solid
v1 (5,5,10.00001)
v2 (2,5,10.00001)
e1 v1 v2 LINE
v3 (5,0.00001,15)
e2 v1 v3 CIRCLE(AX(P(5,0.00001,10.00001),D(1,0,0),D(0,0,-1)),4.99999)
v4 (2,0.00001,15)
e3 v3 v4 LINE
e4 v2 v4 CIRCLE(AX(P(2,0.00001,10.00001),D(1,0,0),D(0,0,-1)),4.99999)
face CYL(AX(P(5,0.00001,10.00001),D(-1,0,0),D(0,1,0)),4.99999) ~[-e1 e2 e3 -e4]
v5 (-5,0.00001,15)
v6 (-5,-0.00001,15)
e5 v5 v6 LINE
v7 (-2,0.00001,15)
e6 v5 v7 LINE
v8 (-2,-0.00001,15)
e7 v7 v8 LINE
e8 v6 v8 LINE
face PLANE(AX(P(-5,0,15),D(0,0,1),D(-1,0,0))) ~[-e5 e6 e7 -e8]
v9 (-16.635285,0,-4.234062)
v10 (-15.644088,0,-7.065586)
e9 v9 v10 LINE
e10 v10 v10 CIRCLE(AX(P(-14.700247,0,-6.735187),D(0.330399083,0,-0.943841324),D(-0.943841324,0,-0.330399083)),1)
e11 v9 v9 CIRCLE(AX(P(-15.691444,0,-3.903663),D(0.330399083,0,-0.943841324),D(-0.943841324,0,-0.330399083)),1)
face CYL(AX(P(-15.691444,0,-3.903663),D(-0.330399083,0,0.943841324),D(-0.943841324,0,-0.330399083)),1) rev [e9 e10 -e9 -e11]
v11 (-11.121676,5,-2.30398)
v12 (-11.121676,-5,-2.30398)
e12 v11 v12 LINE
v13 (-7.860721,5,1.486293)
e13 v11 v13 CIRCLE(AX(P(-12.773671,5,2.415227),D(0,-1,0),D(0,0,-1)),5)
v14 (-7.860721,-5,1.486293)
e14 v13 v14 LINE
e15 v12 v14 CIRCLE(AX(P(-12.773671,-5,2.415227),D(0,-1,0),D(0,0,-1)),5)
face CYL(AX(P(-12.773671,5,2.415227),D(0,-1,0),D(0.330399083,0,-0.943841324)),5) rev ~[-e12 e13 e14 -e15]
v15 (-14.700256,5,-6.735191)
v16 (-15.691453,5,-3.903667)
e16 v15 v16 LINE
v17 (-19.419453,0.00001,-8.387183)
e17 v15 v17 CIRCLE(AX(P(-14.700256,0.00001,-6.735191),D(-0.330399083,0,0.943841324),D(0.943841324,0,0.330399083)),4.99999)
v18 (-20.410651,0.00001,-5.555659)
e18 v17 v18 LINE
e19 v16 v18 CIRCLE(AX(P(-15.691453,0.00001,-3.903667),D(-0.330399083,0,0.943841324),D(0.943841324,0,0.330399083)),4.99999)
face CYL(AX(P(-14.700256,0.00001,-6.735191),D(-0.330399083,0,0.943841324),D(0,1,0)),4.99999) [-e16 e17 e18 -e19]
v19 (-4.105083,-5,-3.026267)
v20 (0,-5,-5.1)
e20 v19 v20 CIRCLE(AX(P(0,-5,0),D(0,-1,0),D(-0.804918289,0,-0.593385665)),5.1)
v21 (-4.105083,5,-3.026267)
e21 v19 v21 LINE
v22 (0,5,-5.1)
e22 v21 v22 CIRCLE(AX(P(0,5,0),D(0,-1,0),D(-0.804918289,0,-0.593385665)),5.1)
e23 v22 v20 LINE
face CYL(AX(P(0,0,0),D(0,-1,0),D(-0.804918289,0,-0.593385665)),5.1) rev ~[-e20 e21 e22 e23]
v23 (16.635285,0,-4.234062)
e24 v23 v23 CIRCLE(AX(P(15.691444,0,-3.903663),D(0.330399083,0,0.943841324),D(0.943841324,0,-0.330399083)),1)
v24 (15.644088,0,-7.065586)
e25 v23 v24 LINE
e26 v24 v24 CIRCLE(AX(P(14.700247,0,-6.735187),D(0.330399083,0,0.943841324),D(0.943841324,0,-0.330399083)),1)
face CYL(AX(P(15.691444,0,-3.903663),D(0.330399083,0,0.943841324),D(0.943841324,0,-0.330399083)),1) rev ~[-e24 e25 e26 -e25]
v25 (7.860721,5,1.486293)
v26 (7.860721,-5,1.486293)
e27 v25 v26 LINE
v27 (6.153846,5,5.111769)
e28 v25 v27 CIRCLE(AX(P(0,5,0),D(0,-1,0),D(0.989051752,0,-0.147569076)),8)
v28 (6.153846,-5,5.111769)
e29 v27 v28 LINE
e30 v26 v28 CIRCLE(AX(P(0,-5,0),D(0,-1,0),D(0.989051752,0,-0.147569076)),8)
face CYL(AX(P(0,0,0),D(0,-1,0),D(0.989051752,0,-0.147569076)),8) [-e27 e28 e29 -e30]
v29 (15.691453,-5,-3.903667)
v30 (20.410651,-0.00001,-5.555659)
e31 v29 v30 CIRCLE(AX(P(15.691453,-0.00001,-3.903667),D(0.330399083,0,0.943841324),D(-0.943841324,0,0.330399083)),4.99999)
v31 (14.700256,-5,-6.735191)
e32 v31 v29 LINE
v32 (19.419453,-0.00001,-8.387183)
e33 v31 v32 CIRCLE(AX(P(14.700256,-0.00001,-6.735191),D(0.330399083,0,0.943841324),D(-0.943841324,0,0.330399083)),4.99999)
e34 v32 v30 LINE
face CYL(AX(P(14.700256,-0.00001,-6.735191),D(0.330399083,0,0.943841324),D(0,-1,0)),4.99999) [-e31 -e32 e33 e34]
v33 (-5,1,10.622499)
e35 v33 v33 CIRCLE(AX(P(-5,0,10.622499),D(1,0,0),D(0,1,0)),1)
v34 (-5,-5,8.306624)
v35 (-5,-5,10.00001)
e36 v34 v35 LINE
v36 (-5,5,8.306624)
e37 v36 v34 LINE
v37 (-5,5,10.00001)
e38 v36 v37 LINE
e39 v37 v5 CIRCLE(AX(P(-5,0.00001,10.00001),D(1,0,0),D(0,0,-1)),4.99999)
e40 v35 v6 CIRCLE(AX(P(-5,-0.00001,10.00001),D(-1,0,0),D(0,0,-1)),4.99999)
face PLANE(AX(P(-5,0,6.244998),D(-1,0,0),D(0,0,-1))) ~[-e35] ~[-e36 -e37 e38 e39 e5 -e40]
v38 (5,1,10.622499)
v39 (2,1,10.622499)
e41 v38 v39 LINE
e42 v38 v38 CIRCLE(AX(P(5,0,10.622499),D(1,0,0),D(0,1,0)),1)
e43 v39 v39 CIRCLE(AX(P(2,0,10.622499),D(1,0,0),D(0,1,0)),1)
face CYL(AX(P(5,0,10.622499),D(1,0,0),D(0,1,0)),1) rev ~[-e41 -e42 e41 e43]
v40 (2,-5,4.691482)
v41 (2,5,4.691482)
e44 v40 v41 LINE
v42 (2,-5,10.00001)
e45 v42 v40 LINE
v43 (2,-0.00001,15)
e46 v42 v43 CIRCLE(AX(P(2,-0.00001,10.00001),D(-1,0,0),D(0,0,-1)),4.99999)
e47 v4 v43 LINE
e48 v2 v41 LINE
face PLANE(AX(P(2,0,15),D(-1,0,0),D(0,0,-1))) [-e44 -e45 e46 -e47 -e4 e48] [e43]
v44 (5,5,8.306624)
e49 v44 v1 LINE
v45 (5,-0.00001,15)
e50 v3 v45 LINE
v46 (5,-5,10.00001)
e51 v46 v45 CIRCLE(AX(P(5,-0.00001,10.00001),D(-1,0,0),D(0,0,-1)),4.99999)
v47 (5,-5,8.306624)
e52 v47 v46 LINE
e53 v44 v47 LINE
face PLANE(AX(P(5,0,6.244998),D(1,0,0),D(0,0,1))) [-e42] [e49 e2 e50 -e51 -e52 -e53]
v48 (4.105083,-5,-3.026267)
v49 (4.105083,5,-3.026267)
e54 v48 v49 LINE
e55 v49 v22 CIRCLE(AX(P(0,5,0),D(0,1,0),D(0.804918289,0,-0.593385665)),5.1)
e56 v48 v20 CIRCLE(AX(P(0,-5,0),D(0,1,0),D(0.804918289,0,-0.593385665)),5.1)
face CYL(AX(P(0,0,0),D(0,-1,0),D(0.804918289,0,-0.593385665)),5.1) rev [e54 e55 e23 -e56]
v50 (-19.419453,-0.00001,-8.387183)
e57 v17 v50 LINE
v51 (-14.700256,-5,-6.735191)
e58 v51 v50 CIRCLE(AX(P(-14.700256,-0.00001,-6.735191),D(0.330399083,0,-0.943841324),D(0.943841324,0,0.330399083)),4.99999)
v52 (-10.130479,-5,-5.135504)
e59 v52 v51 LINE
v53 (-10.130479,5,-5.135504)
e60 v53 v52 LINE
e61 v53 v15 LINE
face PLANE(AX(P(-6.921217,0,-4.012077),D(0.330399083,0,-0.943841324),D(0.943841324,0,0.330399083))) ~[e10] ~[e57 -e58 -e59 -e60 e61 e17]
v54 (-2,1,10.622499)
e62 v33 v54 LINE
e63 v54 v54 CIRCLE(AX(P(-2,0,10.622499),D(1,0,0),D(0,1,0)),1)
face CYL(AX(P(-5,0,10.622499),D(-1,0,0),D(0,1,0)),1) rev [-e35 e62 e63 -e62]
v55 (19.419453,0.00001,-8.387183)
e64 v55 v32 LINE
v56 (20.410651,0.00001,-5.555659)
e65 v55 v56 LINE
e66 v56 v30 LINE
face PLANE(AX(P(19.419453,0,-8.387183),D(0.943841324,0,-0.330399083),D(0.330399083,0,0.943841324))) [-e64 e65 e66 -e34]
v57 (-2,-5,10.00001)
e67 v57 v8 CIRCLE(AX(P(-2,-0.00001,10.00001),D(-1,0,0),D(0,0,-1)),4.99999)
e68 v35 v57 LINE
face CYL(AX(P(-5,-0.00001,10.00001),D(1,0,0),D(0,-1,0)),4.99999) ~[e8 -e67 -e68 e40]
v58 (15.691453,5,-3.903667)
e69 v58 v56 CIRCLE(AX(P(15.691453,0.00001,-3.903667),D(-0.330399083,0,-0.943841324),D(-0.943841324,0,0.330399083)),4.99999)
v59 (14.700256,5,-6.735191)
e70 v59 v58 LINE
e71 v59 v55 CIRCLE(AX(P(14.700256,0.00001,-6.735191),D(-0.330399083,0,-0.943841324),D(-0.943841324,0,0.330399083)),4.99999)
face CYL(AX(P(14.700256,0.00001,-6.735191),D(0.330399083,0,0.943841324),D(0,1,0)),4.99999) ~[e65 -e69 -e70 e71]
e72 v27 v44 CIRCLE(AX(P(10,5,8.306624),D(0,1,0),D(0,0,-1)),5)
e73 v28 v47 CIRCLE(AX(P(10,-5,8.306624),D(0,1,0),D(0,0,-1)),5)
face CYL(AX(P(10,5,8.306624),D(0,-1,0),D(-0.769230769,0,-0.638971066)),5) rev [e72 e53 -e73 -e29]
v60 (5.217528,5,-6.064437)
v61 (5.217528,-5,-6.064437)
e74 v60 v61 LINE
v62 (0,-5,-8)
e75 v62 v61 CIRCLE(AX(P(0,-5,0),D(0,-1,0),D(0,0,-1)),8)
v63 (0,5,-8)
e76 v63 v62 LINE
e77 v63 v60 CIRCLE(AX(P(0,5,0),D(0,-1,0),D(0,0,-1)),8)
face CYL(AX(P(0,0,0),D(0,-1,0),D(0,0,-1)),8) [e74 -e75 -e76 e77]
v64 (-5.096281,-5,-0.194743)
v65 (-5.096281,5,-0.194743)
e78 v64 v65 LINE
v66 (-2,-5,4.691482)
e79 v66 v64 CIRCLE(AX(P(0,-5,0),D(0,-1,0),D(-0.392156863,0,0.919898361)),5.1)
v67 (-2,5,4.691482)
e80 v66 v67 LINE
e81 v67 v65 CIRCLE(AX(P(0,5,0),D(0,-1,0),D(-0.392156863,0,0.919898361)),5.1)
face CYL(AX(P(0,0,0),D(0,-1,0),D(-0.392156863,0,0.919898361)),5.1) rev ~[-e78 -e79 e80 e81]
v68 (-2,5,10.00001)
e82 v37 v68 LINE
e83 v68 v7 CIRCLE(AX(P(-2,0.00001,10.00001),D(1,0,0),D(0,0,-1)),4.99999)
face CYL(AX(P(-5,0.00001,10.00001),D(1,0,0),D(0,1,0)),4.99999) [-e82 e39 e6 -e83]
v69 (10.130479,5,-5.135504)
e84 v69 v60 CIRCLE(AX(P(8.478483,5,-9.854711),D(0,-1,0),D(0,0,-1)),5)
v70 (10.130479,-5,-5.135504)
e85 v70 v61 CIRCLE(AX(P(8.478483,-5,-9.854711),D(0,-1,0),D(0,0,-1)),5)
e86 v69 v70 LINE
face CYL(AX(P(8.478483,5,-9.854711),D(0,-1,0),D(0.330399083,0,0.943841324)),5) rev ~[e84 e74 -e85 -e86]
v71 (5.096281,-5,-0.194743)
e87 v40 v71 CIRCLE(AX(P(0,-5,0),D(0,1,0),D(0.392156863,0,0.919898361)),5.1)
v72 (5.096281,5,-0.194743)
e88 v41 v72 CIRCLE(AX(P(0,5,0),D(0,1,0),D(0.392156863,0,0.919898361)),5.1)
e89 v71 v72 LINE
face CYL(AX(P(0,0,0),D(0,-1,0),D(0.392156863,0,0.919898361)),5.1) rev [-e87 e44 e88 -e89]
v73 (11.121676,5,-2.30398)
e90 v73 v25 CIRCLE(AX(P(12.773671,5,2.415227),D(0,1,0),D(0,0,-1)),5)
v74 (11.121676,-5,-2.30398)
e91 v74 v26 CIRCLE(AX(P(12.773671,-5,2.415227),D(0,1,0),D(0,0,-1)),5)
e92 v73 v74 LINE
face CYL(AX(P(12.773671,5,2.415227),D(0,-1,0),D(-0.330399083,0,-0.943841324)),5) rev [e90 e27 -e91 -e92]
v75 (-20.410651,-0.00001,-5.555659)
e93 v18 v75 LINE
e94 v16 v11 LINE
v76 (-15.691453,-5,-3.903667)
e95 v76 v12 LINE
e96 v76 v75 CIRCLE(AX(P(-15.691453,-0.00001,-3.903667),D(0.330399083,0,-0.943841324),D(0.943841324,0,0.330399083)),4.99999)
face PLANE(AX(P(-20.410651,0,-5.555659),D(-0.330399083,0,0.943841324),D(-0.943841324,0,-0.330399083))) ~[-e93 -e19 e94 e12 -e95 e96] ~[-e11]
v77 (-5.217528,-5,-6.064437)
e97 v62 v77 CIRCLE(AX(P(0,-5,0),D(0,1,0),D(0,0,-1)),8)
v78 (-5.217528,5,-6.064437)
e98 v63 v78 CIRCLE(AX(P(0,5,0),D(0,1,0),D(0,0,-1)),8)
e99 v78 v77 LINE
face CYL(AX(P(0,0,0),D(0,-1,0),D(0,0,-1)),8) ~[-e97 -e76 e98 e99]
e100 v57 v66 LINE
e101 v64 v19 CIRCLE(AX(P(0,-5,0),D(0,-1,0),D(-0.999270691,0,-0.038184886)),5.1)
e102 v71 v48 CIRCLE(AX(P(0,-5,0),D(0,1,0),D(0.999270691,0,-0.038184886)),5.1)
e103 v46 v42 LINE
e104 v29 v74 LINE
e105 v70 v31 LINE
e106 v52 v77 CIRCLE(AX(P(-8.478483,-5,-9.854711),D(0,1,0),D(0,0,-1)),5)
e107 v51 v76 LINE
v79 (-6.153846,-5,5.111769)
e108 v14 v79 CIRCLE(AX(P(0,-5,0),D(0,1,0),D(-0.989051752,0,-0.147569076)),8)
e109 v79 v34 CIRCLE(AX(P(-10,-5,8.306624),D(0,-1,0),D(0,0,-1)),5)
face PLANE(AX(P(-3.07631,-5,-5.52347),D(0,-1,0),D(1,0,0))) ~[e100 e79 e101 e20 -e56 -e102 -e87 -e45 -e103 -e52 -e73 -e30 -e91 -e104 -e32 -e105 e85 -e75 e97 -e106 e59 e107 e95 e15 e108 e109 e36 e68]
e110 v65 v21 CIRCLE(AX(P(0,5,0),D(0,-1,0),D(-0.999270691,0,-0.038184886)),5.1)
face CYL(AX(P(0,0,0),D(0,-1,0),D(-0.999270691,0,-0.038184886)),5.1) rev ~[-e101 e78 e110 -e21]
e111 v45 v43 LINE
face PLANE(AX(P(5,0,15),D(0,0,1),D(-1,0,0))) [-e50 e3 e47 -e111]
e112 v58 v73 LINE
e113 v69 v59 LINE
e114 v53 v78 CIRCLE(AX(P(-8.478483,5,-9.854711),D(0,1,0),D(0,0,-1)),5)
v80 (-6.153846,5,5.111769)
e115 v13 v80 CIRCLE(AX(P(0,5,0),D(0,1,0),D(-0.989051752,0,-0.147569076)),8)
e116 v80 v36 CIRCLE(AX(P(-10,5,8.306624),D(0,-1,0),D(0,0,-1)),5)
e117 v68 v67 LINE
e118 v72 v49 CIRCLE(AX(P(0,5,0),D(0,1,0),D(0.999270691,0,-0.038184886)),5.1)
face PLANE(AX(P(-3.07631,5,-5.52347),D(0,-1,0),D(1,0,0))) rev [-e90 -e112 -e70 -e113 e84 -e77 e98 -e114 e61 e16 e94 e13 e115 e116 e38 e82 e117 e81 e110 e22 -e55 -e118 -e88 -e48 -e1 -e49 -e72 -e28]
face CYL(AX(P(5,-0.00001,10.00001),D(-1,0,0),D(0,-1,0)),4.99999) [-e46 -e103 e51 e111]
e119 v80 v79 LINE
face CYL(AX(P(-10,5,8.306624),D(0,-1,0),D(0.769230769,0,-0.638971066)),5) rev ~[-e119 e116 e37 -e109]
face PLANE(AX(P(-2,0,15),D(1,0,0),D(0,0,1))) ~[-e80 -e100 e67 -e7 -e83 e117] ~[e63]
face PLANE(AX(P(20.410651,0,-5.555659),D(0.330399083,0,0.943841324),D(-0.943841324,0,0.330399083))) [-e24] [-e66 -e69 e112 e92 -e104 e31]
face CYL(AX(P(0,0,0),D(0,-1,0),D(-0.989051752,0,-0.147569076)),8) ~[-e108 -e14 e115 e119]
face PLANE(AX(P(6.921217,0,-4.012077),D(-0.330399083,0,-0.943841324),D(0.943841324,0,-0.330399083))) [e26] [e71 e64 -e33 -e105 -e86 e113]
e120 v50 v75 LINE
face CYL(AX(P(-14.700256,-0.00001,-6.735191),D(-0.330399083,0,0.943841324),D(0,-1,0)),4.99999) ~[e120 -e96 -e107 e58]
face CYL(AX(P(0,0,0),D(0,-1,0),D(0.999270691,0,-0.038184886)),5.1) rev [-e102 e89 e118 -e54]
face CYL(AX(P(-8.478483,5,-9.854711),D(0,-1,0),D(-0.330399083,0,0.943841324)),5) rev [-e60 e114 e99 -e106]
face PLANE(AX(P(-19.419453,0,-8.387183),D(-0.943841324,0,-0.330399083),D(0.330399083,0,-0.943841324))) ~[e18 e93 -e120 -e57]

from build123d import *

# Parameters (mm, degrees)
F1_DEPTH = 5
F2_R     = 1
F3_DEPTH = 25
F4_R     = 1
F5_DEPTH = 25
F6_R     = 4.99999
F7_R     = 5


# Not quite as in the source:
# - a fillet or chamfer is up to 0.001 mm smaller than in the source, because OpenCascade refuses the exact size
# - a feature names something its author has since deleted; it is built from what else it names


with BuildPart() as f1:
    # F0 (on Front) → F1 (new body, symmetric)
    with BuildSketch(Plane.XZ):
        with BuildLine():
            ThreePointArc((4.105083276, -3.0262668912), (2.2995694004, -4.5521402189), (0, -5.1))
            Line((0, -5.1), (0, -8))
            ThreePointArc((0, -8), (3.9939571451, -6.9316885622), (6.9212167652, -4.0120765807))
            Line((6.9212167652, -4.0120765807), (4.105083276, -3.0262668912))
        make_face()
        with BuildLine():
            ThreePointArc((5.0962805256, -0.1947429178), (4.8135907549, -1.6850353244), (4.105083276, -3.0262668912))
            Line((4.105083276, -3.0262668912), (6.9212167652, -4.0120765807))
            ThreePointArc((6.9212167652, -4.0120765807), (7.5507305959, -2.6431926657), (7.9124140148, -1.1805526072))
            Line((7.9124140148, -1.1805526072), (5.0962805256, -0.1947429178))
        make_face()
        with BuildLine():
            ThreePointArc((2, 4.6914816423), (4.3079109714, 2.7298174046), (5.0962805256, -0.1947429178))
            Line((5.0962805256, -0.1947429178), (7.9124140148, -1.1805526072))
            ThreePointArc((7.9124140148, -1.1805526072), (7.4476378384, 2.9210769638), (5, 6.2449979984))
            ThreePointArc((5, 6.2449979984), (3.5795567819, 7.1544932207), (2, 7.7459666924))
            Line((2, 7.7459666924), (2, 4.6914816423))
        make_face()
        with BuildLine():
            ThreePointArc((7.9124140148, -1.1805526072), (7.5507305959, -2.6431926657), (6.9212167652, -4.0120765807))
            Line((6.9212167652, -4.0120765807), (19.4194533219, -8.3871826424))
            Line((19.4194533219, -8.3871826424), (20.4106505716, -5.555658669))
            Line((20.4106505716, -5.555658669), (7.9124140148, -1.1805526072))
        make_face()
        with BuildLine():
            Line((2, 15), (2, 7.7459666924))
            ThreePointArc((2, 7.7459666924), (3.5795567819, 7.1544932207), (5, 6.2449979984))
            Line((5, 6.2449979984), (5, 15))
            Line((5, 15), (2, 15))
        make_face()
    extrude(amount=F1_DEPTH, both=True)

    # F2 (on face) → F3 (cut)
    with BuildSketch(Plane(origin=(0.4955986248, 0, 1.4157619867), x_dir=(0.9438413245, 0, -0.3303990832), z_dir=(0.3303990832, 0, 0.9438413245))):
        with Locations((16.1, 0)):
            Circle(F2_R)
    extrude(amount=-F3_DEPTH, mode=Mode.SUBTRACT)

    # F4 (on face) → F5 (cut)
    with BuildSketch(Plane.YZ.offset(5)):
        with Locations((0, 10.6224989992)):
            Circle(F4_R)
    extrude(amount=-F5_DEPTH, mode=Mode.SUBTRACT)

    # F6 (radius 5 in the source; OpenCascade refuses exactly that, so slightly less here)
    f6_edges = [f1.edges().sort_by_distance(p)[0] for p in [
        (19.915052, 5, -6.971421),
        (19.915052, -5, -6.971421),
        (3.5, -5, 15),
        (3.5, 5, 15),
    ]]
    fillet(f6_edges, radius=F6_R)

    # F7
    f7_edges = [f1.edges().sort_by_distance(p)[0] for p in [
        (5, 0, 6.244998),
        (7.912414, 0, -1.180553),
        (6.921217, 0, -4.012077),
    ]]
    fillet(f7_edges, radius=F7_R)

    # F8: F1 across plane


with BuildPart() as f1_1:
    add(f1.part)
    add(f1.part.mirror(Plane.YZ))


solid = f1_1.part
